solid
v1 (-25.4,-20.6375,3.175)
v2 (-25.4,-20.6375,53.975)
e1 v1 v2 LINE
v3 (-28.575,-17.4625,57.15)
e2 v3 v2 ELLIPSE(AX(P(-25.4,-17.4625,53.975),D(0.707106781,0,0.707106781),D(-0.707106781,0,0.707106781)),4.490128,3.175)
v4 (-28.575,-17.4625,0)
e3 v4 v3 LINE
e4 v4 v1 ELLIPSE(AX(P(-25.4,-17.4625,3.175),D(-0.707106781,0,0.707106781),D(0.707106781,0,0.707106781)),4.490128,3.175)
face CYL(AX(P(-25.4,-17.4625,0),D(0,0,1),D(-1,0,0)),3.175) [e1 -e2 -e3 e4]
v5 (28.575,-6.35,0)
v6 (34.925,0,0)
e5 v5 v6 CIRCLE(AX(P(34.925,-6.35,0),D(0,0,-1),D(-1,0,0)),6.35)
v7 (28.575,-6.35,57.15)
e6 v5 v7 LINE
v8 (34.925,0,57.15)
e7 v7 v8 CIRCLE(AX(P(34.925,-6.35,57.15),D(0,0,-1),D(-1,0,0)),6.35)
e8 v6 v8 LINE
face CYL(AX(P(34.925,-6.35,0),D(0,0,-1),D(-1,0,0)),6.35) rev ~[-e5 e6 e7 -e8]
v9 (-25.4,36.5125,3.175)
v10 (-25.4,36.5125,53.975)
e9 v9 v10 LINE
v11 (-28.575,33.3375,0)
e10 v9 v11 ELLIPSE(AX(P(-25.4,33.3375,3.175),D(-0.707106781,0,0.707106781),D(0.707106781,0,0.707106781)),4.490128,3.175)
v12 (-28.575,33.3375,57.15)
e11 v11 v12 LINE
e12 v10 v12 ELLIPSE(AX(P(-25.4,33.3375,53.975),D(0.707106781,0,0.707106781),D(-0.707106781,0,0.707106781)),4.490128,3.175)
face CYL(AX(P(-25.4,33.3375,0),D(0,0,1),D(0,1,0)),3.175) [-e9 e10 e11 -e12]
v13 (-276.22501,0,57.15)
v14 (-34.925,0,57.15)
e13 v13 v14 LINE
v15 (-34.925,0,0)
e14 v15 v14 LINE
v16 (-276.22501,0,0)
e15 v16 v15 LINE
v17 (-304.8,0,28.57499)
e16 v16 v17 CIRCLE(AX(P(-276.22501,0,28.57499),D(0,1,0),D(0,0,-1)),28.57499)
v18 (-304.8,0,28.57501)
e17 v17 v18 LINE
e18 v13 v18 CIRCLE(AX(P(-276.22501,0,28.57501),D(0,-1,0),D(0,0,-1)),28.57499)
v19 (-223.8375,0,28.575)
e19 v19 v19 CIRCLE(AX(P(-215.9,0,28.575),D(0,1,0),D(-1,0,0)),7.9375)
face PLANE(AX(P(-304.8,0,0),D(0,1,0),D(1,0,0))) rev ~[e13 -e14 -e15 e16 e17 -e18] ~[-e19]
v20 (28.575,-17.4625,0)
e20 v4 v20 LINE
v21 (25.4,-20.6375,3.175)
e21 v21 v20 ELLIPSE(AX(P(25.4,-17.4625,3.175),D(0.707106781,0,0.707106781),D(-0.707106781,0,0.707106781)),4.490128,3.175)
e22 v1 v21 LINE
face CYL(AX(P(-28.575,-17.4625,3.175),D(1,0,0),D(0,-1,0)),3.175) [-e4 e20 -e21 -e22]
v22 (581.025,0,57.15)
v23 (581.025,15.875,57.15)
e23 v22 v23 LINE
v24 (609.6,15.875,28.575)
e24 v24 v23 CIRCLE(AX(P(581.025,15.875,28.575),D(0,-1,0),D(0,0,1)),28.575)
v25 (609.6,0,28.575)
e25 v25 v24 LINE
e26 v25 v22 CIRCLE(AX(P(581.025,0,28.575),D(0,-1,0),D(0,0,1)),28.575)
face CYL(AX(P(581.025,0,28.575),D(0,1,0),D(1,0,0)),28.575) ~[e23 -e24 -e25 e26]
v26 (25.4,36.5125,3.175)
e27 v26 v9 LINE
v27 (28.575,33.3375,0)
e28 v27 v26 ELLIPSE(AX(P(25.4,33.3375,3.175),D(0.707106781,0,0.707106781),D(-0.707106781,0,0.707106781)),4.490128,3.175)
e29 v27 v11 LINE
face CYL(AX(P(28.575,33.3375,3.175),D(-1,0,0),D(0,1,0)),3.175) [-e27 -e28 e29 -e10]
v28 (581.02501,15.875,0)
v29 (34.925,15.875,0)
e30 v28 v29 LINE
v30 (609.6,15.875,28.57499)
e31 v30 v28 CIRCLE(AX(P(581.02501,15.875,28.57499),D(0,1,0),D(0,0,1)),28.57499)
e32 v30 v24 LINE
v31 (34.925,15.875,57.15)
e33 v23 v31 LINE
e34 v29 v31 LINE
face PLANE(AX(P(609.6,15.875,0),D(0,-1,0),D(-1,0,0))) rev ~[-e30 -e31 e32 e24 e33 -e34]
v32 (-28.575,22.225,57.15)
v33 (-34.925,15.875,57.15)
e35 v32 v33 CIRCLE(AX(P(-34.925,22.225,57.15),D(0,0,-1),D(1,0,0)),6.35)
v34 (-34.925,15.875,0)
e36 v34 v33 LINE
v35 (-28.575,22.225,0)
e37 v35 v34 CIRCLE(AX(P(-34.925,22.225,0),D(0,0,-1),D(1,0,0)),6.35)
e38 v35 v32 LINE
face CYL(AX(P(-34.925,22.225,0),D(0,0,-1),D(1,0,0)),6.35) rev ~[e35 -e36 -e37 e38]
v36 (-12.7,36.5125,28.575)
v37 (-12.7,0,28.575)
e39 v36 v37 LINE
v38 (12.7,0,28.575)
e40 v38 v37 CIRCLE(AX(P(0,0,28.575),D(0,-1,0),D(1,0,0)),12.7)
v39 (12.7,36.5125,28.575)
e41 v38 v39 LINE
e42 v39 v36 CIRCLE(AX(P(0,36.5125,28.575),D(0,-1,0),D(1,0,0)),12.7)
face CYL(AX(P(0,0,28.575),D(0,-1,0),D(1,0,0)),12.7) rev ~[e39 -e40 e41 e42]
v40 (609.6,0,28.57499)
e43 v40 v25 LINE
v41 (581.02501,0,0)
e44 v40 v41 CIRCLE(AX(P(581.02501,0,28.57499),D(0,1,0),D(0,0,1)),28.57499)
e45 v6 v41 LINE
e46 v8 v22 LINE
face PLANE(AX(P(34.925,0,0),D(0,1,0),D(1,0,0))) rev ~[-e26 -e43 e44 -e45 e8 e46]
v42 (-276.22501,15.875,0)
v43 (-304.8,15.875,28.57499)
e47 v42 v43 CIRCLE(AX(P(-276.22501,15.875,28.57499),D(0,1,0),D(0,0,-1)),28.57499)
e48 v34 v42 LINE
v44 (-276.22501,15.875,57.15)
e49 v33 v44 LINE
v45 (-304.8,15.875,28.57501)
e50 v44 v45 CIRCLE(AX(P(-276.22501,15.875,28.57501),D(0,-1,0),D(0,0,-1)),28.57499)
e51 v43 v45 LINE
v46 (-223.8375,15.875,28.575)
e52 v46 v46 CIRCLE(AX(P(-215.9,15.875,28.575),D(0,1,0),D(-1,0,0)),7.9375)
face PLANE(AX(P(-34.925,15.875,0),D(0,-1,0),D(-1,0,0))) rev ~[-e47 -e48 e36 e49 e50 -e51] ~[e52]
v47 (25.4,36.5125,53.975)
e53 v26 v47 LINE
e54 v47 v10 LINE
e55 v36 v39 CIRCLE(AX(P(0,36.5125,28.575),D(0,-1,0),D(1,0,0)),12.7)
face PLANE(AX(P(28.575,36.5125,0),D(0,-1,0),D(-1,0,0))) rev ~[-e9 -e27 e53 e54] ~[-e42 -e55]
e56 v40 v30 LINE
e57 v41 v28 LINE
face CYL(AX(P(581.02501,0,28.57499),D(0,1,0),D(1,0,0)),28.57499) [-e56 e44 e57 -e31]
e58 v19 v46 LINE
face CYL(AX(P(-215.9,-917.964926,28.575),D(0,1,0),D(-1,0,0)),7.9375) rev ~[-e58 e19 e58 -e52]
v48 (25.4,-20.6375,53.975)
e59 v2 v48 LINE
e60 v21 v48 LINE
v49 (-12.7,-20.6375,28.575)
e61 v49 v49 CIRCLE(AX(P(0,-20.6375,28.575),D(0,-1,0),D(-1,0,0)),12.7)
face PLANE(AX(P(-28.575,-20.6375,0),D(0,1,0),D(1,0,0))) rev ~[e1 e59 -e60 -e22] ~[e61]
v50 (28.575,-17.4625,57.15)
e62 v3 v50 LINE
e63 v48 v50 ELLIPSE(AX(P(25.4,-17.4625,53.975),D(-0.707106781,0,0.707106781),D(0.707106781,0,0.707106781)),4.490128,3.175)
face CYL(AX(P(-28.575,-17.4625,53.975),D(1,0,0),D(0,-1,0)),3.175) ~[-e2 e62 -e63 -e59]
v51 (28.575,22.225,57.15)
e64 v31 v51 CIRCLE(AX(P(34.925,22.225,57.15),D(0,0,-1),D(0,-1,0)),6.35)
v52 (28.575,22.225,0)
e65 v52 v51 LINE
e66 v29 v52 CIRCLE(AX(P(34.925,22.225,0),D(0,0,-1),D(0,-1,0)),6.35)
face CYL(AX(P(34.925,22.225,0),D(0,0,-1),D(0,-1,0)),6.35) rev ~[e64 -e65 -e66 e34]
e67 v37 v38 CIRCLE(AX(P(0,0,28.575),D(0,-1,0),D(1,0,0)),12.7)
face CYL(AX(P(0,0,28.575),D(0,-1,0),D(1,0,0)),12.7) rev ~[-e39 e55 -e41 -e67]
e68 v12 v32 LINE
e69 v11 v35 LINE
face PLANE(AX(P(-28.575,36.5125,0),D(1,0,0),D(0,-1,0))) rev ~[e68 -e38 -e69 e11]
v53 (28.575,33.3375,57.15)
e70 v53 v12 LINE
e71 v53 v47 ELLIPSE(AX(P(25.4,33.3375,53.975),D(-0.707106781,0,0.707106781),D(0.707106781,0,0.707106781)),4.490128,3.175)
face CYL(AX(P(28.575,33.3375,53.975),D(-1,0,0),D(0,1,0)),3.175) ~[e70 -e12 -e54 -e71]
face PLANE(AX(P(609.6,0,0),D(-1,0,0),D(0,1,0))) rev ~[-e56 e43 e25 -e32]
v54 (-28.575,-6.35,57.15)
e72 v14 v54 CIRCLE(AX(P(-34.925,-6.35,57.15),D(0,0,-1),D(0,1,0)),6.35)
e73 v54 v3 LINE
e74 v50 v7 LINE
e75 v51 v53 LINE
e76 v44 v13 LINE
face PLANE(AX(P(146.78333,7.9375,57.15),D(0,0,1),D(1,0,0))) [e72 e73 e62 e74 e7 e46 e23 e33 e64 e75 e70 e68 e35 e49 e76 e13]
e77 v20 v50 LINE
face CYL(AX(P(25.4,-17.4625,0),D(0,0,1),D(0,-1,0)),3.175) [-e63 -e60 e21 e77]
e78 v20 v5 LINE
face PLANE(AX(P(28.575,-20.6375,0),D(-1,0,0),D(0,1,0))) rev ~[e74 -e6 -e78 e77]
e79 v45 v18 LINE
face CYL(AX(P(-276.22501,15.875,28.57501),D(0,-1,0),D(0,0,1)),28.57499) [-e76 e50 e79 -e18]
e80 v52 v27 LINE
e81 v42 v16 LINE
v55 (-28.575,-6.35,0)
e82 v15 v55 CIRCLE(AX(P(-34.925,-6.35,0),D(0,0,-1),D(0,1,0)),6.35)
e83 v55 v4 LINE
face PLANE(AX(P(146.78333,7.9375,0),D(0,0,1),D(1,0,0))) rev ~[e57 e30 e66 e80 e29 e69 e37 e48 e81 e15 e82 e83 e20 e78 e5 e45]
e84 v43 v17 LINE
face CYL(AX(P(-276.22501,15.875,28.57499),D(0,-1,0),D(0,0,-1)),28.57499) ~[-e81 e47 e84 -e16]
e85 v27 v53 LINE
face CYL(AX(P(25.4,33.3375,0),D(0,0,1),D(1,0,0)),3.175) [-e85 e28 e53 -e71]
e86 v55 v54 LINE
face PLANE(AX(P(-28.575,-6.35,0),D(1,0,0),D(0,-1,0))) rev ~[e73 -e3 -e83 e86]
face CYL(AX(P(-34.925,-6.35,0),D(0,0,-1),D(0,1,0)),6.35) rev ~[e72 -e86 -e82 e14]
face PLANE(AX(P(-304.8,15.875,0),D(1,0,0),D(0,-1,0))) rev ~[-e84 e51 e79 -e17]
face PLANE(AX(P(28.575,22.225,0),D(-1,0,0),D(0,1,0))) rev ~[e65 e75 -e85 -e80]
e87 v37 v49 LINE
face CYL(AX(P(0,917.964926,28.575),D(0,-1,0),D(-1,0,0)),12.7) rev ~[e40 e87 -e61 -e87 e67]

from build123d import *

# Parameters (mm, degrees)
F1_DEPTH = 57.15
F2_R     = 3.175
F3_R     = 28.57499
F4_R     = 28.575
F5_R     = 28.57499
F7_D     = 15.875
F8_D     = 25.4
F8_DEPTH = 38.1
F8_TIP   = 7.6309298617
F9_D     = 25.4


# Not quite as in the source:
# - a fillet or chamfer is up to 0.001 mm smaller than in the source, because OpenCascade refuses the exact size
# - a length typed as a fraction of an inch, garbled in the dataset ("3 / 203.2 mm" for 3/8 in), is restored


with BuildPart() as f1:
    # F0 (on Top) → F1 (new body)
    with BuildSketch(Plane.XY):
        with BuildLine():
            ThreePointArc((28.575, -6.35), (30.4348719395, -1.8598719395), (34.925, 0))
            Line((34.925, 0), (609.6, 0))
            Line((609.6, 0), (609.6, 15.875))
            Line((609.6, 15.875), (34.925, 15.875))
            ThreePointArc((34.925, 15.875), (30.4348719395, 17.7348719395), (28.575, 22.225))
            Line((28.575, 22.225), (28.575, 36.5125))
            Line((28.575, 36.5125), (0, 36.5125))
            Line((0, 36.5125), (-28.575, 36.5125))
            Line((-28.575, 36.5125), (-28.575, 22.225))
            ThreePointArc((-28.575, 22.225), (-30.4348719395, 17.7348719395), (-34.925, 15.875))
            Line((-34.925, 15.875), (-304.8, 15.875))
            Line((-304.8, 15.875), (-304.8, 0))
            Line((-304.8, 0), (-34.925, 0))
            ThreePointArc((-34.925, 0), (-30.4348719395, -1.8598719395), (-28.575, -6.35))
            Line((-28.575, -6.35), (-28.575, -20.6375))
            Line((-28.575, -20.6375), (0, -20.6375))
            Line((0, -20.6375), (28.575, -20.6375))
            Line((28.575, -20.6375), (28.575, -6.35))
        make_face()
    extrude(amount=F1_DEPTH)

    # F2
    f2_edges = [f1.edges().sort_by_distance(p)[0] for p in [
        (28.575, 36.5125, 28.575),
        (0, 36.5125, 57.15),
        (-28.575, 36.5125, 28.575),
        (0, 36.5125, 0),
        (-28.575, -20.6375, 28.575),
        (0, -20.6375, 57.15),
        (28.575, -20.6375, 28.575),
        (0, -20.6375, 0),
    ]]
    fillet(f2_edges, radius=F2_R)

    # F3 (radius 28.575 in the source; OpenCascade refuses exactly that, so slightly less here)
    f3_edges = [f1.edges().sort_by_distance(p)[0] for p in [
        (-304.8, 7.9375, 57.15),
        (-304.8, 7.9375, 0),
    ]]
    fillet(f3_edges, radius=F3_R)

    # F4
    f4_edges = [f1.edges().sort_by_distance(p)[0] for p in [
        (609.6, 7.9375, 57.15),
    ]]
    fillet(f4_edges, radius=F4_R)

    # F5 (radius 28.575 in the source; OpenCascade refuses exactly that, so slightly less here)
    f5_edges = [f1.edges().sort_by_distance(p)[0] for p in [
        (609.6, 7.9375, 0),
    ]]
    fillet(f5_edges, radius=F5_R)

    # F7 (through all)
    with Locations(Plane.XZ):
        with Locations((-215.9, 28.575)):
            Hole(F7_D / 2)

    # F8 (one way)
    with BuildSketch(Plane.XZ):
        with Locations((0, 28.575)):
            Circle(F8_D / 2)
    extrude(amount=-F8_DEPTH, mode=Mode.SUBTRACT)
    with Locations(Plane.XZ):
        with Locations((0, 28.575)):
            with Locations((0, 0, -(F8_DEPTH + F8_TIP / 2))):  # 118° drill point
                Cone(0, F8_D / 2, F8_TIP, mode=Mode.SUBTRACT)

    # F9 (through all)
    with Locations(Plane(origin=(0, 0, 0), x_dir=(1, 0, 0), z_dir=(0, 1, 0))):
        with Locations((0, -28.575)):
            Hole(F9_D / 2)


solid = f1.part
